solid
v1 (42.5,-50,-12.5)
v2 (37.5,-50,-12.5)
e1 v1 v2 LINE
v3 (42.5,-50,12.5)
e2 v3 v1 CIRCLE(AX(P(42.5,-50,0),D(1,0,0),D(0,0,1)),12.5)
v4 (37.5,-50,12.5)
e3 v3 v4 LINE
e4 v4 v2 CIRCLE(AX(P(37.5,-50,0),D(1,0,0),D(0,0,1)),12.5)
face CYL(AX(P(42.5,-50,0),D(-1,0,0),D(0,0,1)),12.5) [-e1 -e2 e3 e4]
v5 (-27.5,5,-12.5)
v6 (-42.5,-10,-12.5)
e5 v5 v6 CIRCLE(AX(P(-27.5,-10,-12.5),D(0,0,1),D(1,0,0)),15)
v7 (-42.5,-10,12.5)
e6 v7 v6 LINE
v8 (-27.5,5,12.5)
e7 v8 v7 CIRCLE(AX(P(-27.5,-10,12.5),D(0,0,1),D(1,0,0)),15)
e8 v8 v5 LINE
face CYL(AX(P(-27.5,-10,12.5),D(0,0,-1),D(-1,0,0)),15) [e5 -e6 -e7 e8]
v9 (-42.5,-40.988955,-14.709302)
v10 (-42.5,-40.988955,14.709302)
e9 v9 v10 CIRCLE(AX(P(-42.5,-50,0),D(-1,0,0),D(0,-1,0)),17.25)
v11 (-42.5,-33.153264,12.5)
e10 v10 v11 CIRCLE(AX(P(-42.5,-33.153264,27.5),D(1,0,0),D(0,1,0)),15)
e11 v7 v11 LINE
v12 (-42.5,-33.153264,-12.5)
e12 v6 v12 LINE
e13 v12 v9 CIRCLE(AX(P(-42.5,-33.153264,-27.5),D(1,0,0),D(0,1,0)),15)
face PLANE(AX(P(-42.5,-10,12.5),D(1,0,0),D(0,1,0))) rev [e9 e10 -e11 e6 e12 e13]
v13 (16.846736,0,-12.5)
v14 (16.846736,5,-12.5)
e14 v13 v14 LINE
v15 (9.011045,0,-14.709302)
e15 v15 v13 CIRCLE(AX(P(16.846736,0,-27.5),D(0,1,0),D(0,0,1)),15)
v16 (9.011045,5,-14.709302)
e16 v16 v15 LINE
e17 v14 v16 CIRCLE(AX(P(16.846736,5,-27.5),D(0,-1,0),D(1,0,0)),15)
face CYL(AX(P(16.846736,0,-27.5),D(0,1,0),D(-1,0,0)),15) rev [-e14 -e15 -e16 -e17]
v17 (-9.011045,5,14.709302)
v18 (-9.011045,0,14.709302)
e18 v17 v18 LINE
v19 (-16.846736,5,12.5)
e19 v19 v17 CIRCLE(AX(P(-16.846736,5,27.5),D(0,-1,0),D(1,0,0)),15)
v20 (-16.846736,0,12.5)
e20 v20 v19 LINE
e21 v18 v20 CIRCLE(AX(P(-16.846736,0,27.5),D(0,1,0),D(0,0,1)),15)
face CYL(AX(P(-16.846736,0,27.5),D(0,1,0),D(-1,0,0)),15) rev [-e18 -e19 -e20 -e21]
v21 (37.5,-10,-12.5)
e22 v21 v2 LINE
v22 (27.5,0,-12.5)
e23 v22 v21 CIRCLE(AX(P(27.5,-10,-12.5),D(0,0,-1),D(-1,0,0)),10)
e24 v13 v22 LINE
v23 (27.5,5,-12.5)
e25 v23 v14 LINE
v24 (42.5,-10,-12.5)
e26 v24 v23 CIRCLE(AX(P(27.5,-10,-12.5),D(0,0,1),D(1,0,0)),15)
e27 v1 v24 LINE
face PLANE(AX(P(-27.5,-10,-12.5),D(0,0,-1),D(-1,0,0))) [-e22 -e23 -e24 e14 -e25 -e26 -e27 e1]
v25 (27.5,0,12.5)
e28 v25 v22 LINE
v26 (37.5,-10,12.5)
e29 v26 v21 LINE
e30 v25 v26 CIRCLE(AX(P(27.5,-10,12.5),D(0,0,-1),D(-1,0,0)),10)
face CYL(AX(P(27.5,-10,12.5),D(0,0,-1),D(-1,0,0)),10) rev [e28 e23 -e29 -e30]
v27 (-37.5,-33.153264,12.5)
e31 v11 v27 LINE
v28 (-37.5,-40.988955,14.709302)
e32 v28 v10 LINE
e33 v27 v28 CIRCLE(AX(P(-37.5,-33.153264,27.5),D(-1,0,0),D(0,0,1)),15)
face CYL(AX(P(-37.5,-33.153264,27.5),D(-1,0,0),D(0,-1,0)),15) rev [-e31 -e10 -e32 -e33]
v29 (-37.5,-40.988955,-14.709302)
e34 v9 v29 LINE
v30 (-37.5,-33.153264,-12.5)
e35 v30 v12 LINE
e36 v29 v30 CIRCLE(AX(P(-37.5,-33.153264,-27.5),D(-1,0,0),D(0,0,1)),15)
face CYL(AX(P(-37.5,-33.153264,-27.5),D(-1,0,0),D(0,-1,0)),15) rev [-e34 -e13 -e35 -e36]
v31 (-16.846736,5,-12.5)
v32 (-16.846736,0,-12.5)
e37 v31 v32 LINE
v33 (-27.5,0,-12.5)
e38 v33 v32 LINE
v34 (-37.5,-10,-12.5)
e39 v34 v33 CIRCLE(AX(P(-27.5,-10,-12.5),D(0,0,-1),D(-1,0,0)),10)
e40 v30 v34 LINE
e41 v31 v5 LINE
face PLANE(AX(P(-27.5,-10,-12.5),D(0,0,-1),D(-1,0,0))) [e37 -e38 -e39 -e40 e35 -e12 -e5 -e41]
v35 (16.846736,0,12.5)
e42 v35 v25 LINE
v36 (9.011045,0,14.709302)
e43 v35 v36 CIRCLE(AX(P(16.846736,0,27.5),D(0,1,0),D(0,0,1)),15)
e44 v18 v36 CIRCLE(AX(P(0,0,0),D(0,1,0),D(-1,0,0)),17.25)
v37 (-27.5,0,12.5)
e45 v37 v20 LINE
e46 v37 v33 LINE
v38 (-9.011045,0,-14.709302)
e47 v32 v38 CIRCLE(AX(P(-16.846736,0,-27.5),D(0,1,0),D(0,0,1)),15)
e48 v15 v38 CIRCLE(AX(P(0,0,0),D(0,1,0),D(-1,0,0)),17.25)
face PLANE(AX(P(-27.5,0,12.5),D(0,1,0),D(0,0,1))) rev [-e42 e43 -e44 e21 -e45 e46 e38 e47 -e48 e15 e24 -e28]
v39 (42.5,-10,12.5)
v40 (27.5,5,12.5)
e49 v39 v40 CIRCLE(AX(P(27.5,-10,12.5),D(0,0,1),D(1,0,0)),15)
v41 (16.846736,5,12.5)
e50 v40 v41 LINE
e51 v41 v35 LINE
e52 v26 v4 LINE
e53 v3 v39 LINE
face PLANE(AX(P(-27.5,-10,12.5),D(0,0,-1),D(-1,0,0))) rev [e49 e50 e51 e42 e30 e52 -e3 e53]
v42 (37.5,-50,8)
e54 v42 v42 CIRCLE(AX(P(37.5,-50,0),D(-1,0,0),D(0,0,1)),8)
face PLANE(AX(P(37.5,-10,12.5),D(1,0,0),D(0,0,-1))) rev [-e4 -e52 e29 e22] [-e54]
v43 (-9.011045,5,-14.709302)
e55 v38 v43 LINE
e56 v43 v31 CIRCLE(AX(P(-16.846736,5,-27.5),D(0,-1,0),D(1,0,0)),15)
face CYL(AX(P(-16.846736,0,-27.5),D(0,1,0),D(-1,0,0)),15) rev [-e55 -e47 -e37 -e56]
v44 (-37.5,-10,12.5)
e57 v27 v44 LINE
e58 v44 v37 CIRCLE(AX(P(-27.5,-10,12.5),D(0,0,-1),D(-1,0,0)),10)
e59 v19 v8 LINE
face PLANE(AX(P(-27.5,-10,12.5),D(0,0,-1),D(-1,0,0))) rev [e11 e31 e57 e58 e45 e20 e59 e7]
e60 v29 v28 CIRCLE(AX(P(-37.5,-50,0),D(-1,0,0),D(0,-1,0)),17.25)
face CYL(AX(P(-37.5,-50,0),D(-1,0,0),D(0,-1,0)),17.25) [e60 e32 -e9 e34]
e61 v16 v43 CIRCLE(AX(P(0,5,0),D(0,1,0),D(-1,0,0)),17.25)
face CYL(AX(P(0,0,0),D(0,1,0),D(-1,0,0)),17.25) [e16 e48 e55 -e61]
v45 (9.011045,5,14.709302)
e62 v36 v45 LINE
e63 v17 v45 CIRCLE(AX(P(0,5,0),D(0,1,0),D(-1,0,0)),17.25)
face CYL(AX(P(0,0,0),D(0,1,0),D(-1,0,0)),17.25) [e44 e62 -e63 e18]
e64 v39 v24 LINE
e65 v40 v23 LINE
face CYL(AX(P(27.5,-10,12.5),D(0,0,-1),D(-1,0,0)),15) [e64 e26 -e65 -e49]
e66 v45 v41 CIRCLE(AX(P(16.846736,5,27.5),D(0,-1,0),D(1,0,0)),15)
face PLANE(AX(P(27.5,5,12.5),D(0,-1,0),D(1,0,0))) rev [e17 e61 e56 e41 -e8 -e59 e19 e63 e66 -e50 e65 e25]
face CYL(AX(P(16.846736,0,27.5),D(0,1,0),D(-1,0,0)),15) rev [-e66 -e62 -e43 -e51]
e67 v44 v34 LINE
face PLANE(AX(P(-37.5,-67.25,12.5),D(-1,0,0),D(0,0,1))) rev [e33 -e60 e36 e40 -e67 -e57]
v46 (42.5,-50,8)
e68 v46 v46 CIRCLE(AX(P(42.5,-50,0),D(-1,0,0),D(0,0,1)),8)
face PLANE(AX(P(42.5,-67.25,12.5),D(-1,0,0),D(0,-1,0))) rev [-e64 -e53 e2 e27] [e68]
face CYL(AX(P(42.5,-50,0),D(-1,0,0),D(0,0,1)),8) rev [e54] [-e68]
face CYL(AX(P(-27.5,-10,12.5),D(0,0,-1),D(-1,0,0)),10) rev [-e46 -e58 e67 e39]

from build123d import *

# Parameters (mm, degrees)
BRACKET_U_SHAPE_DEPTH              = 12.5
SKETCH3_R                          = 17.25
MOTOR_RING_DEPTH                   = 5
MOTOR_RING_FILLETS_15MM_R          = 15
U_BRACKET_BOTTOM_ROUNDING_12_5MM_R = 12.5
SKETCH4_R                          = 17.25
TILT_MOTOR_TAB_DEPTH               = 5
TILT_MOTOR_TAB_FILLETS_15MM_R      = 15
SKETCH6_R                          = 8
BEARING_HOLE_CUT_DEPTH             = 106.925091456


with BuildPart() as part:
    # Sketch2 → Bracket U-shape (new, symmetric)
    with BuildSketch(Plane.XY):
        with BuildLine():
            Line((-37.5, -67.25), (-37.5, -10))
            ThreePointArc((-37.5, -10), (-34.571067812, -2.928932188), (-27.5, 0))
            Line((-27.5, 0), (27.5, 0))
            ThreePointArc((27.5, 0), (34.571067812, -2.928932188), (37.5, -10))
            Line((37.5, -10), (37.5, -67.25))
            Line((37.5, -67.25), (42.5, -67.25))
            Line((42.5, -67.25), (42.5, -10))
            ThreePointArc((42.5, -10), (38.106601718, 0.606601718), (27.5, 5))
            Line((27.5, 5), (-27.5, 5))
            ThreePointArc((-27.5, 5), (-38.106601718, 0.606601718), (-42.5, -10))
            Line((-42.5, -10), (-42.5, -67.25))
            Line((-42.5, -67.25), (-37.5, -67.25))
        make_face()
    extrude(amount=BRACKET_U_SHAPE_DEPTH, both=True)

    # Sketch3 → Motor ring (add)
    with BuildSketch(Plane(origin=(0, 5, 0), x_dir=(1, 0, 0), z_dir=(0, 1, 0))):
        Circle(SKETCH3_R)
    extrude(amount=-MOTOR_RING_DEPTH)

    # Motor ring fillets 15mm
    motor_ring_fillets_15mm_edges = [part.edges().sort_by_distance(p)[0] for p in [
        (11.887493428, 2.5, -12.5),
        (-11.887493428, 2.5, -12.5),
        (-11.887493428, 2.5, 12.5),
        (11.887493428, 2.5, 12.5),
    ]]
    fillet(motor_ring_fillets_15mm_edges, radius=MOTOR_RING_FILLETS_15MM_R)

    # U bracket bottom rounding 12.5mm
    u_bracket_bottom_rounding_12_5mm_edges = [part.edges().sort_by_distance(p)[0] for p in [
        (40, -67.25, 12.5),
        (40, -67.25, -12.5),
        (-40, -67.25, -12.5),
        (-40, -67.25, 12.5),
    ]]
    fillet(u_bracket_bottom_rounding_12_5mm_edges, radius=U_BRACKET_BOTTOM_ROUNDING_12_5MM_R - 0.0001)  # a hair under: the kernel refuses the full size

    # Sketch4 → Tilt motor tab (add)
    with BuildSketch(Plane.ZY.offset(42.5)):
        with Locations((0, -50)):
            Circle(SKETCH4_R)
    extrude(amount=-TILT_MOTOR_TAB_DEPTH)

    # Tilt motor tab fillets 15mm
    tilt_motor_tab_fillets_15mm_edges = [part.edges().sort_by_distance(p)[0] for p in [
        (-40, -38.112506572, 12.5),
        (-40, -38.112506572, -12.5),
    ]]
    fillet(tilt_motor_tab_fillets_15mm_edges, radius=TILT_MOTOR_TAB_FILLETS_15MM_R)

    # Sketch6 → Bearing hole cut (cut, through all)
    with BuildSketch(Plane.ZY.offset(-37.5)):
        with Locations((0, -50)):
            Circle(SKETCH6_R)
        with BuildLine():
            Line((12.5, -54.75), (12.5, -50))
            ThreePointArc((12.5, -50), (0, -62.5), (-12.5, -50))
            Line((-12.5, -50), (-12.5, -54.75))
            ThreePointArc((-12.5, -54.75), (-8.838834765, -63.588834765), (0, -67.25))
            ThreePointArc((0, -67.25), (8.838834765, -63.588834765), (12.5, -54.75))
        make_face()
    extrude(amount=-BEARING_HOLE_CUT_DEPTH, mode=Mode.SUBTRACT)


with BuildPart() as bearing_hole_cut_kept_piece:
    # of the separate pieces the step leaves, the one the design keeps (bearing_hole_cut_pieces_kept)
    add(part.part.solids().sort_by_distance((-37.5, -33.153264411, -12.5))[0])


solid = bearing_hole_cut_kept_piece.part
